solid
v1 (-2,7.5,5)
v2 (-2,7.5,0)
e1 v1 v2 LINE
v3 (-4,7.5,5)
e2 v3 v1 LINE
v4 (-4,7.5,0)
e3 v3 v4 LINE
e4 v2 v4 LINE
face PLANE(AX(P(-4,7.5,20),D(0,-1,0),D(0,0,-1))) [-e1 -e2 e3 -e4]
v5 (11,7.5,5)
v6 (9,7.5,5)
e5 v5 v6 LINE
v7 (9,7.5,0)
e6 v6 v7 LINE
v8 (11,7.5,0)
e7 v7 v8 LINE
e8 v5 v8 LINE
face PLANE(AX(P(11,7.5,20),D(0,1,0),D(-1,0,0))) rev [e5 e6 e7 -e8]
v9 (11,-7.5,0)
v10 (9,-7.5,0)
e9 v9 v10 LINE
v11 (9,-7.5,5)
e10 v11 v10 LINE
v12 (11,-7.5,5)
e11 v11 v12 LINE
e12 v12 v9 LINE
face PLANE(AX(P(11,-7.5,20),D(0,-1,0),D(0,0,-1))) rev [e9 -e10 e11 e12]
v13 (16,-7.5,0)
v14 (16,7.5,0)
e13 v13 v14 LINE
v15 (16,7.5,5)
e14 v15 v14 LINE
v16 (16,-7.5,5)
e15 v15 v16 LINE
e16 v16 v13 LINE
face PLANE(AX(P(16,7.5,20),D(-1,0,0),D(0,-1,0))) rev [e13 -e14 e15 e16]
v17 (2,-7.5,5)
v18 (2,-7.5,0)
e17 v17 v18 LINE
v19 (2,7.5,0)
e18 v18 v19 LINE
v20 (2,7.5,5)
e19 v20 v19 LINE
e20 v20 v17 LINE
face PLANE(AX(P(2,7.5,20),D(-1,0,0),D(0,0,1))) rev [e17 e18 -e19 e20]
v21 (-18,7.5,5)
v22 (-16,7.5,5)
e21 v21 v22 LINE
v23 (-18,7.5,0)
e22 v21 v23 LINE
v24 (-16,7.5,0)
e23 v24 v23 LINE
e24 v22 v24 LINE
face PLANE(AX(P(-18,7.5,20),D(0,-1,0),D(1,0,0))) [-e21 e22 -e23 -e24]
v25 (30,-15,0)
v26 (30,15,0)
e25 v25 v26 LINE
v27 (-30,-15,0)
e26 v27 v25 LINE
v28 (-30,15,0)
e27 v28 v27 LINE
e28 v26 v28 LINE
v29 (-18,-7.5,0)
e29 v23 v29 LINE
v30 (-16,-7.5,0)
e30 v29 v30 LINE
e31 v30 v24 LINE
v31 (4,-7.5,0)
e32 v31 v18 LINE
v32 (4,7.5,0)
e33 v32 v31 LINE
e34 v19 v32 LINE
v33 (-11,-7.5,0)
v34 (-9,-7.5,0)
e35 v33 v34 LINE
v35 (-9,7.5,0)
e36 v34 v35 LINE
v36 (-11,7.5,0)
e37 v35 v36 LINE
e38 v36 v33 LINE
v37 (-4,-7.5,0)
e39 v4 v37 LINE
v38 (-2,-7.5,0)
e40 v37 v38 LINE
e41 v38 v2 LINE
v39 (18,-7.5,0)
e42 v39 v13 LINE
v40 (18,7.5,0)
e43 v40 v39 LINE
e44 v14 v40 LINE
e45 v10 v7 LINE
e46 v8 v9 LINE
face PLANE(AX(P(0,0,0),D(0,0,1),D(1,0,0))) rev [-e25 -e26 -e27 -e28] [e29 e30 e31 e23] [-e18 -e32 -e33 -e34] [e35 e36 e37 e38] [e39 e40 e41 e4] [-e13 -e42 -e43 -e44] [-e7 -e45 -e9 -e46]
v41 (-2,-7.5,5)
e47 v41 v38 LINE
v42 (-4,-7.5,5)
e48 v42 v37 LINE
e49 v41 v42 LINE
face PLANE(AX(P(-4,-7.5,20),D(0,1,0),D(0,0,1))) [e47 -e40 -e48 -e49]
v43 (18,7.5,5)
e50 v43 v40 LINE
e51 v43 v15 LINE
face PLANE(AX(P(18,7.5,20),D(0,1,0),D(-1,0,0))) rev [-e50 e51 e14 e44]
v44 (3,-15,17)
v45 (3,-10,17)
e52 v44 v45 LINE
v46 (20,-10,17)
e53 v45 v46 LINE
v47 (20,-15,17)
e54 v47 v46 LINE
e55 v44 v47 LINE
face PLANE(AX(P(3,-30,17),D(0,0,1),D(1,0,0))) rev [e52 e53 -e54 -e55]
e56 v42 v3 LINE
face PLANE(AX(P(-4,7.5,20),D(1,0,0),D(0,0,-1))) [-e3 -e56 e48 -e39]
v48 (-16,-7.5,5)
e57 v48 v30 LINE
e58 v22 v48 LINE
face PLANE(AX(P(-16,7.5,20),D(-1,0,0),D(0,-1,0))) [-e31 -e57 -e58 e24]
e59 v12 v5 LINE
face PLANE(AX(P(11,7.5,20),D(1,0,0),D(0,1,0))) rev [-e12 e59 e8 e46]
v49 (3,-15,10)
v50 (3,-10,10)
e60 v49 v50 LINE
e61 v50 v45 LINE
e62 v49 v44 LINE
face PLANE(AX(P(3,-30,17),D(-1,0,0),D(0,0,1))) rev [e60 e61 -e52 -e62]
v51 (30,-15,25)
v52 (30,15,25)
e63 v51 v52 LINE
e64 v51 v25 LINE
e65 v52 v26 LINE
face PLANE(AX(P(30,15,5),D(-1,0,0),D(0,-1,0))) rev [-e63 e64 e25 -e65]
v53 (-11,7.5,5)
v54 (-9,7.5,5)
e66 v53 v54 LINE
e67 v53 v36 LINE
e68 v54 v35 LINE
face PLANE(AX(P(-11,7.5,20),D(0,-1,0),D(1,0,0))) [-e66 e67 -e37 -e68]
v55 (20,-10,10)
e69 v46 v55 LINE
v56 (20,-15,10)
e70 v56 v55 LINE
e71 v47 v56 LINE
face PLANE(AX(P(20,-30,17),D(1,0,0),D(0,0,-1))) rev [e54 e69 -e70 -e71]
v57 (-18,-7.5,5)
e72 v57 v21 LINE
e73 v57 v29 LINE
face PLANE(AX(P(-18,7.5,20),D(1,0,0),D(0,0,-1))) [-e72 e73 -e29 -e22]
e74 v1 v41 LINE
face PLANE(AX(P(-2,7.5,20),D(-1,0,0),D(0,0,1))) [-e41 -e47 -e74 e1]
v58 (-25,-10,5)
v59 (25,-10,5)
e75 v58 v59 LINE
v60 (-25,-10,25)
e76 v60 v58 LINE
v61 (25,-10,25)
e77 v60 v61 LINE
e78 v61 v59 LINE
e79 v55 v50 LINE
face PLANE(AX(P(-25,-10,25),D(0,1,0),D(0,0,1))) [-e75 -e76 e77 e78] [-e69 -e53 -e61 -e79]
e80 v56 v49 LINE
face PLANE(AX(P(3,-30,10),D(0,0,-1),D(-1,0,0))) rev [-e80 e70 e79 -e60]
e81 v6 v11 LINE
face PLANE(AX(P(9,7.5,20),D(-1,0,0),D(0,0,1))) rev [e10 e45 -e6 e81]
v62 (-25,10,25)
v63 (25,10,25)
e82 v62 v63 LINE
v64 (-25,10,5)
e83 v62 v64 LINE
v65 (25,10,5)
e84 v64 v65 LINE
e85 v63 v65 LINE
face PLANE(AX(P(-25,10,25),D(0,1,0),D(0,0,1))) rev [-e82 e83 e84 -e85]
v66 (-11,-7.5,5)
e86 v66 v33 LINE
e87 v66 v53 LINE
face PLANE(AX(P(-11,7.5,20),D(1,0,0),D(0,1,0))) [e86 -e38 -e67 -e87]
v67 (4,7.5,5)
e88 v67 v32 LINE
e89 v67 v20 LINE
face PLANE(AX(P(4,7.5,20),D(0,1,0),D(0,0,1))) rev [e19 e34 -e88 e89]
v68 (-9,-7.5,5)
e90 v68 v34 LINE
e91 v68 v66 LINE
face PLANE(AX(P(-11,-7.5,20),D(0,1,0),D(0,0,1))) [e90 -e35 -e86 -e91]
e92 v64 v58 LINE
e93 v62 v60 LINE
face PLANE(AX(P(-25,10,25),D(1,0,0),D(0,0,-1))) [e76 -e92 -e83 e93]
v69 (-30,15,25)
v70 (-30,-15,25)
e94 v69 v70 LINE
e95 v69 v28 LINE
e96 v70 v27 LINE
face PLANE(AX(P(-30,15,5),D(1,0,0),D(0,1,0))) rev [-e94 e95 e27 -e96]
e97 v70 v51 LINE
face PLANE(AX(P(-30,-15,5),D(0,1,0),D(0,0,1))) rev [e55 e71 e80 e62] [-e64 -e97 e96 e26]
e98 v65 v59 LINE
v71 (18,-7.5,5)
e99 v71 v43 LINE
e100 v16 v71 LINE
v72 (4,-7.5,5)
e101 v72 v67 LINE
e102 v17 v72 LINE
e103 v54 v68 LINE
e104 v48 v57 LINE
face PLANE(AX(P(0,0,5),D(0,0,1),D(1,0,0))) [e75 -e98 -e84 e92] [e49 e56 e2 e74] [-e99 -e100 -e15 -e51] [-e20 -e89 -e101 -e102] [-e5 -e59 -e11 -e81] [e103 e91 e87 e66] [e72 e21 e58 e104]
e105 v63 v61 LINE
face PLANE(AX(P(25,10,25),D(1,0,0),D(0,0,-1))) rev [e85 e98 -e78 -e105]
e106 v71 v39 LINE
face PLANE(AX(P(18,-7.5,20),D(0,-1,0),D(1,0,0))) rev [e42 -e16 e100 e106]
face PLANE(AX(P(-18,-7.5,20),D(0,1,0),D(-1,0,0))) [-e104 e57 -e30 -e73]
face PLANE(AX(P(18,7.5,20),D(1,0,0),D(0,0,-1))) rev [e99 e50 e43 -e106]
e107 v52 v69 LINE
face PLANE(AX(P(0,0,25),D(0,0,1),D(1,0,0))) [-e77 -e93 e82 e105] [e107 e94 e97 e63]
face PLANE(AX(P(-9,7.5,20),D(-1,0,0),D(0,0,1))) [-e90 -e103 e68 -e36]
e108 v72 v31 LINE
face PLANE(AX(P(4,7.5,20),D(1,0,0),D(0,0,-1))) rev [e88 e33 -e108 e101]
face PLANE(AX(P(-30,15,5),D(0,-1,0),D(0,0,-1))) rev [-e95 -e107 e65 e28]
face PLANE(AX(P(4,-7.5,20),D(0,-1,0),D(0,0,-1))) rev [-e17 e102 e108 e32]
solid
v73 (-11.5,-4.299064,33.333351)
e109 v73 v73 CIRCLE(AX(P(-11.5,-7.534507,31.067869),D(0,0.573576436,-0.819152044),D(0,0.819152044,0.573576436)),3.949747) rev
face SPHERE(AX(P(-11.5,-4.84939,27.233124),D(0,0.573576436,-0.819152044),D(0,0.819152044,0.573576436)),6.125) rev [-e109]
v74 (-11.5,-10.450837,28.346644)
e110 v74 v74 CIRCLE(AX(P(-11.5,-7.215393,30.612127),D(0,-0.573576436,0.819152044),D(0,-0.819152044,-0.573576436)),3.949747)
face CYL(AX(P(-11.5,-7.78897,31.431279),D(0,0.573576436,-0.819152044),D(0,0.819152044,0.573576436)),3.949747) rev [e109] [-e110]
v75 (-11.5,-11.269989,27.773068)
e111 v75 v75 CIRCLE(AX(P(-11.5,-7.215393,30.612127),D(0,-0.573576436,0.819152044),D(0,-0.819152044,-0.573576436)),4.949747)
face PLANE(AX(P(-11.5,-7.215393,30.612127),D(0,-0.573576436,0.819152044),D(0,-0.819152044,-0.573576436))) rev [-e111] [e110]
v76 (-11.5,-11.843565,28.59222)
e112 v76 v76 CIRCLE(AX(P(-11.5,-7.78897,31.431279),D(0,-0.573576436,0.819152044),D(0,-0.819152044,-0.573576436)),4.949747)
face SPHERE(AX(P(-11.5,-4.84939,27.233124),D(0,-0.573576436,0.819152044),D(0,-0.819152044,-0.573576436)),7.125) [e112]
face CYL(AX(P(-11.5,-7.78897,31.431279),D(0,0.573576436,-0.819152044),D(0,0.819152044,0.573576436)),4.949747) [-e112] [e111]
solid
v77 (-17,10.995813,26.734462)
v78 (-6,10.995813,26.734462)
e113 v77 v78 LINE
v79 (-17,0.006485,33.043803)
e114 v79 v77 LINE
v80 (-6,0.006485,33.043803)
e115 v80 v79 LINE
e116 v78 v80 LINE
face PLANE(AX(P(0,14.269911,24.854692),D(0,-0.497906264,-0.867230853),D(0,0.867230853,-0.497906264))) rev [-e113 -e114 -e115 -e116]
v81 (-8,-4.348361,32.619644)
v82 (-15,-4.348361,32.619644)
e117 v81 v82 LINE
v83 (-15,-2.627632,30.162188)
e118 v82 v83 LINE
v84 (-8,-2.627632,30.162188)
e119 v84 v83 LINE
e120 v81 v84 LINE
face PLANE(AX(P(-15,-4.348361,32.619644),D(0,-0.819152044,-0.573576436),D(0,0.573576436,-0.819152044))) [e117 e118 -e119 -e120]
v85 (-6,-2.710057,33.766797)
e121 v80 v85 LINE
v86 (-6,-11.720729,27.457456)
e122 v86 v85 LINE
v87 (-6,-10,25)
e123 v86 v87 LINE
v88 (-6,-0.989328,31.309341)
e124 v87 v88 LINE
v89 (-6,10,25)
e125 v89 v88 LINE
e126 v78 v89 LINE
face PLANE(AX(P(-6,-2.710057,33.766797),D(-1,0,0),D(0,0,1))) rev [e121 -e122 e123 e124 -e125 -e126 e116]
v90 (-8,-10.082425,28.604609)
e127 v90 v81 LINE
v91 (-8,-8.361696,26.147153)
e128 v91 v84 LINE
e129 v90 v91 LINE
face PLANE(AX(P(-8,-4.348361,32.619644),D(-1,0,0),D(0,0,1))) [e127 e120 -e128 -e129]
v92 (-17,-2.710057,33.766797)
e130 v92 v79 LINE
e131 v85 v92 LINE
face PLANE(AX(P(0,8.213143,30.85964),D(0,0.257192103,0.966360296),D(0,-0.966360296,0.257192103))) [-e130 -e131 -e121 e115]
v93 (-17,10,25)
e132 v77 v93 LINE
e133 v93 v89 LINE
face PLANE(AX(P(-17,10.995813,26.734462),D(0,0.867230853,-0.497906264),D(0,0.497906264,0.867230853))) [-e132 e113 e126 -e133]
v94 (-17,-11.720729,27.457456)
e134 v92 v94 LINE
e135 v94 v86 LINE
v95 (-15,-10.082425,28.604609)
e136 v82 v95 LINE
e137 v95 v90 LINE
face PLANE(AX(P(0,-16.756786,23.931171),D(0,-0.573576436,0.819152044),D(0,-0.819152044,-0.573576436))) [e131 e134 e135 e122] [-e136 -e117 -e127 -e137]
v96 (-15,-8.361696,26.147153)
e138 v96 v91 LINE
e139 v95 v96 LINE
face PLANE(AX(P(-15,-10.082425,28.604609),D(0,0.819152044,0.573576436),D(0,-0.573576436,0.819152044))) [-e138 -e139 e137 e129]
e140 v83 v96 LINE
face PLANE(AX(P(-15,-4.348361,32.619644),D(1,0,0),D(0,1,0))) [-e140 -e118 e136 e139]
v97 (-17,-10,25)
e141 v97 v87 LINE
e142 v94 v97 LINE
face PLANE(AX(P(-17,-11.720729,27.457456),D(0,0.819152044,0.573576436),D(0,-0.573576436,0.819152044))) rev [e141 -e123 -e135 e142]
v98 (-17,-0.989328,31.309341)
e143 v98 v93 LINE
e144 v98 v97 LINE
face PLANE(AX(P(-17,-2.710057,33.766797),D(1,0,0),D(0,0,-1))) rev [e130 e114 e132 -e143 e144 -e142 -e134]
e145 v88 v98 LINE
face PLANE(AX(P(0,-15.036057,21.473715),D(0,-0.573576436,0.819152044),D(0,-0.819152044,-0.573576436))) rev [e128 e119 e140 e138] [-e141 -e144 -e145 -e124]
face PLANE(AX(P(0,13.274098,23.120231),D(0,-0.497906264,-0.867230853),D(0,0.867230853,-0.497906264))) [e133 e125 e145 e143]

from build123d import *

# Parameters (mm, degrees)
SKETCH1_W           = 60
SKETCH1_H           = 30
BOSS_EXTRUDE1_DEPTH = 5
SKETCH3_W           = 60
SKETCH3_H           = 30
SKETCH3_W_2         = 50
SKETCH3_H_2         = 20
BOSS_EXTRUDE2_DEPTH = 20
SKETCH4_W           = 2
SKETCH4_H           = 15
CUT_EXTRUDE1_DEPTH  = 20
SKETCH5_W           = 17
SKETCH5_H           = 7
CUT_EXTRUDE2_DEPTH  = 20
SKETCH6_W           = 11
SKETCH6_H           = 11
SKETCH6_W_2         = 7
SKETCH6_H_2         = 7
BOSS_EXTRUDE3_DEPTH = 3
BOSS_EXTRUDE5_START = 3
SKETCH10_R          = 4.949747468
BOSS_EXTRUDE5_DEPTH = 1
DOME5_FACE_RADIUS   = 4.949747468
DOME5_HEIGHT        = 2
SKETCH12_W          = 11
SKETCH12_H          = 12.671744178
BOSS_EXTRUDE9_DEPTH = 2
LOFT1_START         = -17
LOFT1_DEPTH         = 11


# Read off the part's stored shape, not the designer's step: Shell1, Loft1
with BuildPart() as part:
    # Sketch1 → Boss-Extrude1 (new body)
    with BuildSketch(Plane.XY):
        Rectangle(SKETCH1_W, SKETCH1_H)
    extrude(amount=BOSS_EXTRUDE1_DEPTH)

    # Sketch3 → Boss-Extrude2 (add)
    with BuildSketch(Plane.XY.offset(5)):
        Rectangle(SKETCH3_W, SKETCH3_H)
        Rectangle(SKETCH3_W_2, SKETCH3_H_2, mode=Mode.SUBTRACT)
    extrude(amount=BOSS_EXTRUDE2_DEPTH)

    # Sketch4 → Cut-Extrude1 (cut)
    with BuildSketch(Plane(origin=(0, 0, 0), x_dir=(-1, 0, 0), z_dir=(0, 0, -1))):
        with Locations((-17, 0)):
            Rectangle(SKETCH4_W, SKETCH4_H)
        with Locations((-10, 0)):
            Rectangle(SKETCH4_W, SKETCH4_H)
        with Locations((-3, 0)):
            Rectangle(SKETCH4_W, SKETCH4_H)
    cut_extrude1 = extrude(amount=-CUT_EXTRUDE1_DEPTH, mode=Mode.SUBTRACT)

    # Mirror1: Cut-Extrude1 across plane
    add(cut_extrude1.mirror(Plane(origin=(0, 0, 0), x_dir=(0, 0, 1), z_dir=(1, 0, 0))), mode=Mode.SUBTRACT)

    # Sketch5 → Cut-Extrude2 (cut)
    with BuildSketch(Plane(origin=(0, -10, 0), x_dir=(1, 0, 0), z_dir=(0, 1, 0))):
        with Locations((11.5, -13.5)):
            Rectangle(SKETCH5_W, SKETCH5_H)
    extrude(amount=-CUT_EXTRUDE2_DEPTH, mode=Mode.SUBTRACT)


with BuildPart() as body_2:
    # Sketch6 → Boss-Extrude3 (new body)
    with BuildSketch(Plane(origin=(0, -15.036057043, 21.473714896), x_dir=(1, 0, 0), z_dir=(0, -0.5735764363510473, 0.819152044288991))):
        with Locations((-11.5, 11.647890466)):
            Rectangle(SKETCH6_W, SKETCH6_H)
        with Locations((-11.5, 11.647890466)):
            Rectangle(SKETCH6_W_2, SKETCH6_H_2, mode=Mode.SUBTRACT)
    extrude(amount=BOSS_EXTRUDE3_DEPTH)



with BuildPart() as body_3:
    # Sketch10 → Boss-Extrude5 (new body)
    with BuildSketch(Plane(origin=(0, -15.036057043, 21.473714896), x_dir=(1, 0, 0), z_dir=(0, -0.5735764363510473, 0.819152044288991)).offset(BOSS_EXTRUDE5_START)):
        with Locations(Location((-11.5, 11.647890466, 0), (0, 0, 270))):
            Circle(SKETCH10_R)
    extrude(amount=BOSS_EXTRUDE5_DEPTH)

    # Dome5: a dome of height H over a round flat face of radius A is a cap of a sphere of radius (A * A + H * H) / (2 * H)
    dome5_r = (DOME5_FACE_RADIUS * DOME5_FACE_RADIUS + DOME5_HEIGHT * DOME5_HEIGHT) / (2 * DOME5_HEIGHT)
    dome5_base = Plane((-11.5, -7.788969502, 31.431278577), z_dir=(0, -0.573576436351, 0.819152044289))
    with Locations(dome5_base.offset(DOME5_HEIGHT - dome5_r)):
        dome5_ball = Sphere(dome5_r, mode=Mode.PRIVATE)
    add(split(dome5_ball, bisect_by=dome5_base, keep=Keep.TOP, mode=Mode.PRIVATE))

    # Shell1 outline → Shell1 (revolve, cut)
    with BuildSketch(Plane(origin=(-11.5, 9.541393287, 6.680955504), x_dir=(1, 0, 0), z_dir=(0, 0.8191520442889911, 0.5735764363510472))):
        with BuildLine():
            ThreePointArc((0, -31.214565471), (2.10265339, -30.842345123), (3.949747473, -29.770924237))
            Line((3.949747473, -29.770924237), (3.949747468, -29.214565471))
            Line((3.949747468, -29.214565471), (0, -29.214565471))
            Line((0, -29.214565471), (0, -31.214565471))
        make_face()
    revolve(axis=Axis((-11.5, 9.541393287, 6.680955504), (0, 0.5735764363510472, -0.8191520442889911)), mode=Mode.SUBTRACT)


with BuildPart() as body_4:
    # Sketch12 → Boss-Extrude9 (new body)
    with BuildSketch(Plane(origin=(0, 13.274098323, 23.12023055), x_dir=(-1, 0, 0), z_dir=(0, -0.4979062638284767, -0.8672308530260945))):
        with Locations((11.5, -10.111220154)):
            Rectangle(SKETCH12_W, SKETCH12_H)
    extrude(amount=-BOSS_EXTRUDE9_DEPTH)


with BuildPart() as body_2_1:
    add(body_2.part)

    add(body_4.part)  # Loft1 merges body 4
    # Loft1 outline → Loft1 (add)
    with BuildSketch(Plane.YZ.offset(LOFT1_START)):
        Polygon((-0.989327513, 31.3093408), (0.006485015, 33.043802506), (-2.710056822, 33.766796933), align=None)
    extrude(amount=LOFT1_DEPTH)


solid = Compound([part.part, body_3.part, body_2_1.part])
